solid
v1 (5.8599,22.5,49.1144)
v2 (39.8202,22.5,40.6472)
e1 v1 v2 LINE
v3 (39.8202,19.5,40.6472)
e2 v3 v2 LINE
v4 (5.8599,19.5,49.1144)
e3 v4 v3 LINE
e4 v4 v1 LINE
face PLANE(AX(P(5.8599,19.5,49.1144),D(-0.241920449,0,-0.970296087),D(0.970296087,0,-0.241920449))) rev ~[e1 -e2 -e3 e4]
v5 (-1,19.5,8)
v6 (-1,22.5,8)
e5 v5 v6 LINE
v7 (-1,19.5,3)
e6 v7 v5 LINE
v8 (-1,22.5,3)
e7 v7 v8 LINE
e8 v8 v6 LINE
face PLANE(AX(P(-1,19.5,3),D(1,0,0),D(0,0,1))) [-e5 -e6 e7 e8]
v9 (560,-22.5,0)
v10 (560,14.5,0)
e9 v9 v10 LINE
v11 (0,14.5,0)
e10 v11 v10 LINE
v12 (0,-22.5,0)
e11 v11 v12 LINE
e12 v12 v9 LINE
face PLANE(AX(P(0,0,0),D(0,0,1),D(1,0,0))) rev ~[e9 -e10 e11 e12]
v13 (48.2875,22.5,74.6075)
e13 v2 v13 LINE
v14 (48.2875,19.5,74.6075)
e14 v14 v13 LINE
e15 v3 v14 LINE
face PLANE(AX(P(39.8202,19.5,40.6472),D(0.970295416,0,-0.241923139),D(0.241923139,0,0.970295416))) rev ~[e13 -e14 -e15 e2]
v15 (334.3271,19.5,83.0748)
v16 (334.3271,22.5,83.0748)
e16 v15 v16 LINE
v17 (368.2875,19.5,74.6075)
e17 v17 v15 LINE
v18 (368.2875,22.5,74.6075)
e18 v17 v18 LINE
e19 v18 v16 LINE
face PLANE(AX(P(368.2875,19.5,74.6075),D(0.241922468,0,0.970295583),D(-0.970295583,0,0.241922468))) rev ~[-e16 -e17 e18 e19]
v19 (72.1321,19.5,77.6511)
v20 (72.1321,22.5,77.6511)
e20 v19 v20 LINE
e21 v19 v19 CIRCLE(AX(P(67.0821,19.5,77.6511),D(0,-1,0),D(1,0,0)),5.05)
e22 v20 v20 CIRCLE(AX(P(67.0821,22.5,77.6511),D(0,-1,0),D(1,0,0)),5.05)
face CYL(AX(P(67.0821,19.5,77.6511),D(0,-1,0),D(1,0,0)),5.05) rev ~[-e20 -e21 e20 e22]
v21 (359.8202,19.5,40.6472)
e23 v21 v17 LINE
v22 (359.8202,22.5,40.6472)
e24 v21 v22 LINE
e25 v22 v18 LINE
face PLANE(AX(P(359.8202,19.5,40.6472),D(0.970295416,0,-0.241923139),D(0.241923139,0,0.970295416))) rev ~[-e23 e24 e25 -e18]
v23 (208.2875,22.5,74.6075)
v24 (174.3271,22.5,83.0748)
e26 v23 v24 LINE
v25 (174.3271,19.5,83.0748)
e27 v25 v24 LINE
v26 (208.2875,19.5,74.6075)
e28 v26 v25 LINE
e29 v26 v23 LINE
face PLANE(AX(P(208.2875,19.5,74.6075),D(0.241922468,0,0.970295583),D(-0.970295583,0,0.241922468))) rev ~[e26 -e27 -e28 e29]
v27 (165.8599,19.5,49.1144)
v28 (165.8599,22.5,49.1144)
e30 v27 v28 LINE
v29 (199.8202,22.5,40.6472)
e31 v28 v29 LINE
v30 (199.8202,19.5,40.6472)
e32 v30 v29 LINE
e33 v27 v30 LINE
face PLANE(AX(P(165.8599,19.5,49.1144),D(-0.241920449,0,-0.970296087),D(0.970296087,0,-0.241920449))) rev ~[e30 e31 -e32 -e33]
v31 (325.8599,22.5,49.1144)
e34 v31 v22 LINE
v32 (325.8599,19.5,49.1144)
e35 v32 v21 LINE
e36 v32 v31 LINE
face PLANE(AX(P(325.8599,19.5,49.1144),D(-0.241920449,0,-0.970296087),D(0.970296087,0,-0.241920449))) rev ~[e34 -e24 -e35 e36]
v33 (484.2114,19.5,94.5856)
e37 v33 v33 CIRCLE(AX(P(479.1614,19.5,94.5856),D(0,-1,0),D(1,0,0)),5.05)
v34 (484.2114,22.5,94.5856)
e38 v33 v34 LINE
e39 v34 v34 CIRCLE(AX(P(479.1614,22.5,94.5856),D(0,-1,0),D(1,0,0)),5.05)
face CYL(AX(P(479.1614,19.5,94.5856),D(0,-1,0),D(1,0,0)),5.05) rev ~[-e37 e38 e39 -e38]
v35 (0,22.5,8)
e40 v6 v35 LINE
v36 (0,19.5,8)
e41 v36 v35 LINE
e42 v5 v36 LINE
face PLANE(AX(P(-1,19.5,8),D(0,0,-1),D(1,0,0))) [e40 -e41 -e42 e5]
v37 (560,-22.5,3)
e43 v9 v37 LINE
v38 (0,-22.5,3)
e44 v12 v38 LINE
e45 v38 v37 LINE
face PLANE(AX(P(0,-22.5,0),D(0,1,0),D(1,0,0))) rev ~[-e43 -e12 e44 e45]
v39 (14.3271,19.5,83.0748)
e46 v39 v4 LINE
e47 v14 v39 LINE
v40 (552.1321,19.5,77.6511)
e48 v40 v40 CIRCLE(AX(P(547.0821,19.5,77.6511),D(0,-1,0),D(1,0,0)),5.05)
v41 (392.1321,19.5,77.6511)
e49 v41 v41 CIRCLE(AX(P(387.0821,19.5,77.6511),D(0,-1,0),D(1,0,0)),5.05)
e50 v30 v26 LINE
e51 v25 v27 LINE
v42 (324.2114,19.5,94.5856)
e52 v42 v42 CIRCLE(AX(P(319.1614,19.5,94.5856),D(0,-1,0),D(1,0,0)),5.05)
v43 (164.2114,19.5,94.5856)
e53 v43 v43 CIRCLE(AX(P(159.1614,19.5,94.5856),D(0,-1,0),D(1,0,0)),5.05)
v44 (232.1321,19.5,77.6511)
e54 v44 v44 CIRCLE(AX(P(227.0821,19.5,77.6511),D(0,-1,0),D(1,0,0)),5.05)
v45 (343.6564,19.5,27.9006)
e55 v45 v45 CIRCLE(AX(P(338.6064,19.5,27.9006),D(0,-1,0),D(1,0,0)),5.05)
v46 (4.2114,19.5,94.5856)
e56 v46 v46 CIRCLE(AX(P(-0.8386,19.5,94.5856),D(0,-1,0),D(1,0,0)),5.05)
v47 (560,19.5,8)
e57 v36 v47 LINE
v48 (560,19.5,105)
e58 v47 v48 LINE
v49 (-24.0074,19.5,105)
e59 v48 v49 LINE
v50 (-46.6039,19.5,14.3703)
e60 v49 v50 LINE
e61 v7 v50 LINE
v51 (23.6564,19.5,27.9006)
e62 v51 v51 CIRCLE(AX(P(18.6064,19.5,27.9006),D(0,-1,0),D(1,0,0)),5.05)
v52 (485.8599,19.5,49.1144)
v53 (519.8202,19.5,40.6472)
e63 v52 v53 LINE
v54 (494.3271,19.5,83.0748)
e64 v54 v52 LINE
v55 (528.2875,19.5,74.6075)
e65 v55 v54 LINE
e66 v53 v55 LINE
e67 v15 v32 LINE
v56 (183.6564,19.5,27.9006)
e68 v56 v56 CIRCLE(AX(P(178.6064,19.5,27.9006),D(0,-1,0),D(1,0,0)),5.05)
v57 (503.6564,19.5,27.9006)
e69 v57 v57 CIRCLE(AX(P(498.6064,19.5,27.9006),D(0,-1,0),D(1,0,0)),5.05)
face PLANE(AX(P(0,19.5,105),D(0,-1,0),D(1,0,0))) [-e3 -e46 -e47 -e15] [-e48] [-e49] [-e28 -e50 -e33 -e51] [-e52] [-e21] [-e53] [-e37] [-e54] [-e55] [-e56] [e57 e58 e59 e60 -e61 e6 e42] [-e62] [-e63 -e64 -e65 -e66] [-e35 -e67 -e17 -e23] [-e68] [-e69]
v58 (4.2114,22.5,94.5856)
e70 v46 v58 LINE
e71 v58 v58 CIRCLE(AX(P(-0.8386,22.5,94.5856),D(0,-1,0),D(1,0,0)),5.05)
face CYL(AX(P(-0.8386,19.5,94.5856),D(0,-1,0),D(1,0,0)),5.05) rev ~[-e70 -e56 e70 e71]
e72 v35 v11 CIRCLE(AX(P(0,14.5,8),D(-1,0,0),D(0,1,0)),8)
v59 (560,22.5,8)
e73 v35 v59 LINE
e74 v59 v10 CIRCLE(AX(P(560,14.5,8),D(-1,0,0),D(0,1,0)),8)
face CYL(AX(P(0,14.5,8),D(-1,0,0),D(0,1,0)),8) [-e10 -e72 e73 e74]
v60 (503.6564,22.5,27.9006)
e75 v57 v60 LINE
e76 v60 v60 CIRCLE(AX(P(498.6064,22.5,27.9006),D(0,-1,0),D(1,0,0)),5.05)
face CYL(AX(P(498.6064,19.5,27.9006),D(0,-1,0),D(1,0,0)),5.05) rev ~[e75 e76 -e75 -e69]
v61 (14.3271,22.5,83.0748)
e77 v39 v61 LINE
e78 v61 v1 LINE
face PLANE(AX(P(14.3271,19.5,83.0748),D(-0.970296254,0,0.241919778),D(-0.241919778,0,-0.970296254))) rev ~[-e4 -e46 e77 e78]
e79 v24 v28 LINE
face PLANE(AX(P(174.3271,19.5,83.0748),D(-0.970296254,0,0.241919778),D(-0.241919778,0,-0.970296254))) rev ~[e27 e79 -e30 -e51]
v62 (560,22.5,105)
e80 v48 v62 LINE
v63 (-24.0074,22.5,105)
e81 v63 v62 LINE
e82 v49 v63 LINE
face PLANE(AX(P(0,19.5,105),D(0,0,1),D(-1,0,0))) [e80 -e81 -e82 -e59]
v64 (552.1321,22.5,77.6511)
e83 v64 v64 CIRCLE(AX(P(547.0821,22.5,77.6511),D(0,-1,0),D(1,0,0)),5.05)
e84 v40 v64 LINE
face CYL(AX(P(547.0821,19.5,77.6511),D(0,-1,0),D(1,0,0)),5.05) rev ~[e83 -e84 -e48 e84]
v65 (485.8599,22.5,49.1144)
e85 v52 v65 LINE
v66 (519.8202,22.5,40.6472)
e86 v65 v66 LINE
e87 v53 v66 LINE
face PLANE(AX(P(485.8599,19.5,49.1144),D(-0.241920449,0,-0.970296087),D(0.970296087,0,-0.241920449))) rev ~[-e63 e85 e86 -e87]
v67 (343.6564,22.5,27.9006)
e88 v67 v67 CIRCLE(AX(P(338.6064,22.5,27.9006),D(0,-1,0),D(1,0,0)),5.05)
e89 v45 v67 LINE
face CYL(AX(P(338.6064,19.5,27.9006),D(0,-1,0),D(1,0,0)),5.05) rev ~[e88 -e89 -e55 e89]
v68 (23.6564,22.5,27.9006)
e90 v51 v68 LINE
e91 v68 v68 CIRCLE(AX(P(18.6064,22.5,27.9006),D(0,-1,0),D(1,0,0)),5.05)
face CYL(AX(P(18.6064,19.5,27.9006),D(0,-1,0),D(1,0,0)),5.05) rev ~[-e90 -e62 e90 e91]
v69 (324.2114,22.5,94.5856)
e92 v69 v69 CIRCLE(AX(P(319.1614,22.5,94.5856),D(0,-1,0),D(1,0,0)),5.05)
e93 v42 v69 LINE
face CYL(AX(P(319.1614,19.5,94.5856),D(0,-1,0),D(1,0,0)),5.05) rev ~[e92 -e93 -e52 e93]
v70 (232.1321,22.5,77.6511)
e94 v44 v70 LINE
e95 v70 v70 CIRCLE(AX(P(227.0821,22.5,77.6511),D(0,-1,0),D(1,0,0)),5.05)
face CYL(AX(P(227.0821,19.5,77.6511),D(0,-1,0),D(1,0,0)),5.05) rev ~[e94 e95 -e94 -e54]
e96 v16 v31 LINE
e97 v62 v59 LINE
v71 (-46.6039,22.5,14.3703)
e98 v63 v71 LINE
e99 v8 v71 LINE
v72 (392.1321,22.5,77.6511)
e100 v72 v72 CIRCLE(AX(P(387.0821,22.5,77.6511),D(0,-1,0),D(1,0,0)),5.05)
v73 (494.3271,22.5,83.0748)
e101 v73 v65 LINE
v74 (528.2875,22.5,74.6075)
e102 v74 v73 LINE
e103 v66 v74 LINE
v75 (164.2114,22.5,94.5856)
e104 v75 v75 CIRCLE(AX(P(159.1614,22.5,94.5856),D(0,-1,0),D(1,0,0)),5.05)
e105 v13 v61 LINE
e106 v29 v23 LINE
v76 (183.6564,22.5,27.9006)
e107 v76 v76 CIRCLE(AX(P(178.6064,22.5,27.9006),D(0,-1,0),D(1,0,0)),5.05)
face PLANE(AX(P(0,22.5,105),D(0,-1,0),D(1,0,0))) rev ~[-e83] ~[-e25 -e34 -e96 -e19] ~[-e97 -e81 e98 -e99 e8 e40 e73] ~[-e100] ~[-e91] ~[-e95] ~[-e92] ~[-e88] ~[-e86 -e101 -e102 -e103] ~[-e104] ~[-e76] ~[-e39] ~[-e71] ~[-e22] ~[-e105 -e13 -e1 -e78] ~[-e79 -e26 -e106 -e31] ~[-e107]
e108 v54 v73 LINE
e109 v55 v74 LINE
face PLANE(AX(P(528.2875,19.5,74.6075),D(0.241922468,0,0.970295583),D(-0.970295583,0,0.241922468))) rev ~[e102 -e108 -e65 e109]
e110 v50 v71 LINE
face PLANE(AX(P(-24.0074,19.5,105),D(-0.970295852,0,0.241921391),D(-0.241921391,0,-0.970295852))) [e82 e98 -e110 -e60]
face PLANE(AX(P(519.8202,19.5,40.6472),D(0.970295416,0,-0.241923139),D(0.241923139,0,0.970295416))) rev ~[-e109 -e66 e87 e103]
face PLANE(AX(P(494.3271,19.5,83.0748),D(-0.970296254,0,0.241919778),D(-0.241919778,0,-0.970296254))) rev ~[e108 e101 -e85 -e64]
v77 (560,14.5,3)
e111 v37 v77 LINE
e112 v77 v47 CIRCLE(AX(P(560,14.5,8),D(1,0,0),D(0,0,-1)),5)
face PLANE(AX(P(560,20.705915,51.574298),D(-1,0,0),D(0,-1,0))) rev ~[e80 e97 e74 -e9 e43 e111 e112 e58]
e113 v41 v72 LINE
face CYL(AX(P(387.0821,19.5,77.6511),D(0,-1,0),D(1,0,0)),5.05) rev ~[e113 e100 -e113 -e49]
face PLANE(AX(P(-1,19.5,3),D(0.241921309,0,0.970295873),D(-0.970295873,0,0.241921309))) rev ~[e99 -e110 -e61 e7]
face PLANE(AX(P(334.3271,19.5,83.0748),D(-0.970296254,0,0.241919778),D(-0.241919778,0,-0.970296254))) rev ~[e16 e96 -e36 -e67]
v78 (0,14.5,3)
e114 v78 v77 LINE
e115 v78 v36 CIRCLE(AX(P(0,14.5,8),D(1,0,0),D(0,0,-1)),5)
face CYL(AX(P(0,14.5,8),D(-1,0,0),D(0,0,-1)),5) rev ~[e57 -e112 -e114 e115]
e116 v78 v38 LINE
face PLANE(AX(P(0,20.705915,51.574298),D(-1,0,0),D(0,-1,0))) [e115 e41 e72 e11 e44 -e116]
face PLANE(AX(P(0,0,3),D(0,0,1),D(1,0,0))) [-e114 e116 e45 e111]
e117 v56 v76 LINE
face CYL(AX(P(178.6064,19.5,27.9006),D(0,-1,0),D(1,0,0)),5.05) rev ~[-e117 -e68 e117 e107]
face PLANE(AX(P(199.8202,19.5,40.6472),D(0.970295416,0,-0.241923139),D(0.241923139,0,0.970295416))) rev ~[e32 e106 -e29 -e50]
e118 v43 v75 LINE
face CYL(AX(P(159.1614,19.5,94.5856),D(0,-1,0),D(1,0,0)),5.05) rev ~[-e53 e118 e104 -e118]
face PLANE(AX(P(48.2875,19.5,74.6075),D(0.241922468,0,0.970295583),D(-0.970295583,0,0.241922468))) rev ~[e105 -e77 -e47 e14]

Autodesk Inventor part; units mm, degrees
ref_plane "YZ Plane" through (0, 0, 0) normal (1, 0, 0) x (0, 1, 0)
ref_plane "XZ Plane" through (0, 0, 0) normal (0, 1, 0) x (-1, 0, 0)
ref_plane "XY Plane" through (0, 0, 0) normal (0, 0, 1) x (1, 0, 0)
sketch "Sketch1" plane through (0, 0, 0) normal (0, 0, 1) x (1, 0, 0)
  line L0 (0, -22.5) -> (560, -22.5)
  line L1 (560, -22.5) -> (560, 22.5)
  line L2 (560, 22.5) -> (0, 22.5)
  line L3 (0, 22.5) -> (0, -22.5)
  line L4 (0, -22.5) -> (560, 22.5) construction
  line L5 (560, -22.5) -> (0, 22.5) construction
  point P0 (0, 0)
  point P1 (0, 0)
  dimension "d154" = 560
  dimension "d155" = 45
extrude "Plate3" add sketch "Sketch1" along normal blind 3
sketch "Sketch7" plane through (0, 19.5, 0) normal (0, 1, 0) x (-1, 0, 0)
  line L0 (-560, 0) -> (0, 0)
  line L1 (0, 0) -> (0, 105)
  line L2 (0, 105) -> (-560, 105)
  line L3 (-560, 105) -> (-560, 0)
edge flange "Flange3" height 105 angle 90 thickness 3 bend radius 5 thickness toward (0, 1, 0) relief round relief width 3 relief depth 1.5 edges at (280, 22.5, 3) wall of the first edge with corners at (560, 19.5, 0) (0, 19.5, 0) (0, 19.5, 105) (560, 19.5, 105)
bend "Bend3"
corner "Corner3"
sketch "Sketch11" plane through (0, 19.5, 105) normal (0, -1, 0) x (1, 0, 0)
  line L0 (0, -97) -> (560, -97) projected
  line L1 (560, -97) -> (560, 0) projected
  line L2 (560, 0) -> (0, 0) projected
  line L3 (0, -97) -> (0, 0) projected
  line L4 (0, 0) -> (-24.0074, 0)
  line L5 (-24.0074, 0) -> (-49.4388, -102)
  line L6 (-49.4388, -102) -> (-1, -102)
  line L7 (-1, -102) -> (-1, -97)
  line L8 (-1, -97) -> (0, -97)
  line L9 (560, -102) -> (0, -102) projected
  line L10 (-1, -102) -> (-46.6039, -90.6297)
  point P0 (0, -105)
  dimension "d193" = 1
  dimension "d194" = 24.0074
  dimension "d195" = 14
  dimension "d203" = 47
extrude "Extrusion6" add sketch "Sketch11" against normal up to surface (3 mm away) contours L8 L7 L10 L5 L4 L3
sketch "Sketch12" plane through (560, 19.5, 8) normal (0, -1, 0) x (1, 0, 0)
  line L0 (-511.7125, 66.6075) -> (-545.6729, 75.0748)
  line L1 (-545.6729, 75.0748) -> (-554.1401, 41.1144)
  line L2 (-554.1401, 41.1144) -> (-520.1798, 32.6472)
  line L3 (-520.1798, 32.6472) -> (-511.7125, 66.6075)
  line L4 (-511.7125, 66.6075) -> (-554.1401, 41.1144) construction
  line L5 (-545.6729, 75.0748) -> (-520.1798, 32.6472) construction
  circle A0 centre (-541.3936, 19.9006) radius 5.05
  circle A1 centre (-492.9179, 69.6511) radius 5.05
  circle A2 centre (-560.8386, 86.5856) radius 5.05
  line L6 (-492.9179, 69.6511) -> (-560.8386, 86.5856) construction
  line L7 (-560.8386, 86.5856) -> (-541.3936, 19.9006) construction
  line L8 (-541.3936, 19.9006) -> (-492.9179, 69.6511) construction
  line L9 (-528.6927, 70.8411) -> (-541.3936, 19.9006) construction
  line L10 (-584.0074, 97) -> (-606.6039, 6.3703) projected
  point P0 (-560, -8)
  point P1 (-532.9263, 53.861)
  point P2 (-544.0023, 9.4376)
  dimension "d206" = 35
  dimension "d207" = 35
  dimension "d208" = 10.1
  dimension "d209" = 70
  dimension "d210" = 60
  dimension "d211" = 25
  dimension "d213" = 12
  dimension "d214" = 60
extrude "Cut1" cut sketch "Sketch12" against normal blind 3
pattern_linear "Rectangular Pattern5" count 4 spacing 160 along (1, 0, 0) of "Cut1"
properties part number "DS-B-102 ridge bottom" material "Stainless Steel"
